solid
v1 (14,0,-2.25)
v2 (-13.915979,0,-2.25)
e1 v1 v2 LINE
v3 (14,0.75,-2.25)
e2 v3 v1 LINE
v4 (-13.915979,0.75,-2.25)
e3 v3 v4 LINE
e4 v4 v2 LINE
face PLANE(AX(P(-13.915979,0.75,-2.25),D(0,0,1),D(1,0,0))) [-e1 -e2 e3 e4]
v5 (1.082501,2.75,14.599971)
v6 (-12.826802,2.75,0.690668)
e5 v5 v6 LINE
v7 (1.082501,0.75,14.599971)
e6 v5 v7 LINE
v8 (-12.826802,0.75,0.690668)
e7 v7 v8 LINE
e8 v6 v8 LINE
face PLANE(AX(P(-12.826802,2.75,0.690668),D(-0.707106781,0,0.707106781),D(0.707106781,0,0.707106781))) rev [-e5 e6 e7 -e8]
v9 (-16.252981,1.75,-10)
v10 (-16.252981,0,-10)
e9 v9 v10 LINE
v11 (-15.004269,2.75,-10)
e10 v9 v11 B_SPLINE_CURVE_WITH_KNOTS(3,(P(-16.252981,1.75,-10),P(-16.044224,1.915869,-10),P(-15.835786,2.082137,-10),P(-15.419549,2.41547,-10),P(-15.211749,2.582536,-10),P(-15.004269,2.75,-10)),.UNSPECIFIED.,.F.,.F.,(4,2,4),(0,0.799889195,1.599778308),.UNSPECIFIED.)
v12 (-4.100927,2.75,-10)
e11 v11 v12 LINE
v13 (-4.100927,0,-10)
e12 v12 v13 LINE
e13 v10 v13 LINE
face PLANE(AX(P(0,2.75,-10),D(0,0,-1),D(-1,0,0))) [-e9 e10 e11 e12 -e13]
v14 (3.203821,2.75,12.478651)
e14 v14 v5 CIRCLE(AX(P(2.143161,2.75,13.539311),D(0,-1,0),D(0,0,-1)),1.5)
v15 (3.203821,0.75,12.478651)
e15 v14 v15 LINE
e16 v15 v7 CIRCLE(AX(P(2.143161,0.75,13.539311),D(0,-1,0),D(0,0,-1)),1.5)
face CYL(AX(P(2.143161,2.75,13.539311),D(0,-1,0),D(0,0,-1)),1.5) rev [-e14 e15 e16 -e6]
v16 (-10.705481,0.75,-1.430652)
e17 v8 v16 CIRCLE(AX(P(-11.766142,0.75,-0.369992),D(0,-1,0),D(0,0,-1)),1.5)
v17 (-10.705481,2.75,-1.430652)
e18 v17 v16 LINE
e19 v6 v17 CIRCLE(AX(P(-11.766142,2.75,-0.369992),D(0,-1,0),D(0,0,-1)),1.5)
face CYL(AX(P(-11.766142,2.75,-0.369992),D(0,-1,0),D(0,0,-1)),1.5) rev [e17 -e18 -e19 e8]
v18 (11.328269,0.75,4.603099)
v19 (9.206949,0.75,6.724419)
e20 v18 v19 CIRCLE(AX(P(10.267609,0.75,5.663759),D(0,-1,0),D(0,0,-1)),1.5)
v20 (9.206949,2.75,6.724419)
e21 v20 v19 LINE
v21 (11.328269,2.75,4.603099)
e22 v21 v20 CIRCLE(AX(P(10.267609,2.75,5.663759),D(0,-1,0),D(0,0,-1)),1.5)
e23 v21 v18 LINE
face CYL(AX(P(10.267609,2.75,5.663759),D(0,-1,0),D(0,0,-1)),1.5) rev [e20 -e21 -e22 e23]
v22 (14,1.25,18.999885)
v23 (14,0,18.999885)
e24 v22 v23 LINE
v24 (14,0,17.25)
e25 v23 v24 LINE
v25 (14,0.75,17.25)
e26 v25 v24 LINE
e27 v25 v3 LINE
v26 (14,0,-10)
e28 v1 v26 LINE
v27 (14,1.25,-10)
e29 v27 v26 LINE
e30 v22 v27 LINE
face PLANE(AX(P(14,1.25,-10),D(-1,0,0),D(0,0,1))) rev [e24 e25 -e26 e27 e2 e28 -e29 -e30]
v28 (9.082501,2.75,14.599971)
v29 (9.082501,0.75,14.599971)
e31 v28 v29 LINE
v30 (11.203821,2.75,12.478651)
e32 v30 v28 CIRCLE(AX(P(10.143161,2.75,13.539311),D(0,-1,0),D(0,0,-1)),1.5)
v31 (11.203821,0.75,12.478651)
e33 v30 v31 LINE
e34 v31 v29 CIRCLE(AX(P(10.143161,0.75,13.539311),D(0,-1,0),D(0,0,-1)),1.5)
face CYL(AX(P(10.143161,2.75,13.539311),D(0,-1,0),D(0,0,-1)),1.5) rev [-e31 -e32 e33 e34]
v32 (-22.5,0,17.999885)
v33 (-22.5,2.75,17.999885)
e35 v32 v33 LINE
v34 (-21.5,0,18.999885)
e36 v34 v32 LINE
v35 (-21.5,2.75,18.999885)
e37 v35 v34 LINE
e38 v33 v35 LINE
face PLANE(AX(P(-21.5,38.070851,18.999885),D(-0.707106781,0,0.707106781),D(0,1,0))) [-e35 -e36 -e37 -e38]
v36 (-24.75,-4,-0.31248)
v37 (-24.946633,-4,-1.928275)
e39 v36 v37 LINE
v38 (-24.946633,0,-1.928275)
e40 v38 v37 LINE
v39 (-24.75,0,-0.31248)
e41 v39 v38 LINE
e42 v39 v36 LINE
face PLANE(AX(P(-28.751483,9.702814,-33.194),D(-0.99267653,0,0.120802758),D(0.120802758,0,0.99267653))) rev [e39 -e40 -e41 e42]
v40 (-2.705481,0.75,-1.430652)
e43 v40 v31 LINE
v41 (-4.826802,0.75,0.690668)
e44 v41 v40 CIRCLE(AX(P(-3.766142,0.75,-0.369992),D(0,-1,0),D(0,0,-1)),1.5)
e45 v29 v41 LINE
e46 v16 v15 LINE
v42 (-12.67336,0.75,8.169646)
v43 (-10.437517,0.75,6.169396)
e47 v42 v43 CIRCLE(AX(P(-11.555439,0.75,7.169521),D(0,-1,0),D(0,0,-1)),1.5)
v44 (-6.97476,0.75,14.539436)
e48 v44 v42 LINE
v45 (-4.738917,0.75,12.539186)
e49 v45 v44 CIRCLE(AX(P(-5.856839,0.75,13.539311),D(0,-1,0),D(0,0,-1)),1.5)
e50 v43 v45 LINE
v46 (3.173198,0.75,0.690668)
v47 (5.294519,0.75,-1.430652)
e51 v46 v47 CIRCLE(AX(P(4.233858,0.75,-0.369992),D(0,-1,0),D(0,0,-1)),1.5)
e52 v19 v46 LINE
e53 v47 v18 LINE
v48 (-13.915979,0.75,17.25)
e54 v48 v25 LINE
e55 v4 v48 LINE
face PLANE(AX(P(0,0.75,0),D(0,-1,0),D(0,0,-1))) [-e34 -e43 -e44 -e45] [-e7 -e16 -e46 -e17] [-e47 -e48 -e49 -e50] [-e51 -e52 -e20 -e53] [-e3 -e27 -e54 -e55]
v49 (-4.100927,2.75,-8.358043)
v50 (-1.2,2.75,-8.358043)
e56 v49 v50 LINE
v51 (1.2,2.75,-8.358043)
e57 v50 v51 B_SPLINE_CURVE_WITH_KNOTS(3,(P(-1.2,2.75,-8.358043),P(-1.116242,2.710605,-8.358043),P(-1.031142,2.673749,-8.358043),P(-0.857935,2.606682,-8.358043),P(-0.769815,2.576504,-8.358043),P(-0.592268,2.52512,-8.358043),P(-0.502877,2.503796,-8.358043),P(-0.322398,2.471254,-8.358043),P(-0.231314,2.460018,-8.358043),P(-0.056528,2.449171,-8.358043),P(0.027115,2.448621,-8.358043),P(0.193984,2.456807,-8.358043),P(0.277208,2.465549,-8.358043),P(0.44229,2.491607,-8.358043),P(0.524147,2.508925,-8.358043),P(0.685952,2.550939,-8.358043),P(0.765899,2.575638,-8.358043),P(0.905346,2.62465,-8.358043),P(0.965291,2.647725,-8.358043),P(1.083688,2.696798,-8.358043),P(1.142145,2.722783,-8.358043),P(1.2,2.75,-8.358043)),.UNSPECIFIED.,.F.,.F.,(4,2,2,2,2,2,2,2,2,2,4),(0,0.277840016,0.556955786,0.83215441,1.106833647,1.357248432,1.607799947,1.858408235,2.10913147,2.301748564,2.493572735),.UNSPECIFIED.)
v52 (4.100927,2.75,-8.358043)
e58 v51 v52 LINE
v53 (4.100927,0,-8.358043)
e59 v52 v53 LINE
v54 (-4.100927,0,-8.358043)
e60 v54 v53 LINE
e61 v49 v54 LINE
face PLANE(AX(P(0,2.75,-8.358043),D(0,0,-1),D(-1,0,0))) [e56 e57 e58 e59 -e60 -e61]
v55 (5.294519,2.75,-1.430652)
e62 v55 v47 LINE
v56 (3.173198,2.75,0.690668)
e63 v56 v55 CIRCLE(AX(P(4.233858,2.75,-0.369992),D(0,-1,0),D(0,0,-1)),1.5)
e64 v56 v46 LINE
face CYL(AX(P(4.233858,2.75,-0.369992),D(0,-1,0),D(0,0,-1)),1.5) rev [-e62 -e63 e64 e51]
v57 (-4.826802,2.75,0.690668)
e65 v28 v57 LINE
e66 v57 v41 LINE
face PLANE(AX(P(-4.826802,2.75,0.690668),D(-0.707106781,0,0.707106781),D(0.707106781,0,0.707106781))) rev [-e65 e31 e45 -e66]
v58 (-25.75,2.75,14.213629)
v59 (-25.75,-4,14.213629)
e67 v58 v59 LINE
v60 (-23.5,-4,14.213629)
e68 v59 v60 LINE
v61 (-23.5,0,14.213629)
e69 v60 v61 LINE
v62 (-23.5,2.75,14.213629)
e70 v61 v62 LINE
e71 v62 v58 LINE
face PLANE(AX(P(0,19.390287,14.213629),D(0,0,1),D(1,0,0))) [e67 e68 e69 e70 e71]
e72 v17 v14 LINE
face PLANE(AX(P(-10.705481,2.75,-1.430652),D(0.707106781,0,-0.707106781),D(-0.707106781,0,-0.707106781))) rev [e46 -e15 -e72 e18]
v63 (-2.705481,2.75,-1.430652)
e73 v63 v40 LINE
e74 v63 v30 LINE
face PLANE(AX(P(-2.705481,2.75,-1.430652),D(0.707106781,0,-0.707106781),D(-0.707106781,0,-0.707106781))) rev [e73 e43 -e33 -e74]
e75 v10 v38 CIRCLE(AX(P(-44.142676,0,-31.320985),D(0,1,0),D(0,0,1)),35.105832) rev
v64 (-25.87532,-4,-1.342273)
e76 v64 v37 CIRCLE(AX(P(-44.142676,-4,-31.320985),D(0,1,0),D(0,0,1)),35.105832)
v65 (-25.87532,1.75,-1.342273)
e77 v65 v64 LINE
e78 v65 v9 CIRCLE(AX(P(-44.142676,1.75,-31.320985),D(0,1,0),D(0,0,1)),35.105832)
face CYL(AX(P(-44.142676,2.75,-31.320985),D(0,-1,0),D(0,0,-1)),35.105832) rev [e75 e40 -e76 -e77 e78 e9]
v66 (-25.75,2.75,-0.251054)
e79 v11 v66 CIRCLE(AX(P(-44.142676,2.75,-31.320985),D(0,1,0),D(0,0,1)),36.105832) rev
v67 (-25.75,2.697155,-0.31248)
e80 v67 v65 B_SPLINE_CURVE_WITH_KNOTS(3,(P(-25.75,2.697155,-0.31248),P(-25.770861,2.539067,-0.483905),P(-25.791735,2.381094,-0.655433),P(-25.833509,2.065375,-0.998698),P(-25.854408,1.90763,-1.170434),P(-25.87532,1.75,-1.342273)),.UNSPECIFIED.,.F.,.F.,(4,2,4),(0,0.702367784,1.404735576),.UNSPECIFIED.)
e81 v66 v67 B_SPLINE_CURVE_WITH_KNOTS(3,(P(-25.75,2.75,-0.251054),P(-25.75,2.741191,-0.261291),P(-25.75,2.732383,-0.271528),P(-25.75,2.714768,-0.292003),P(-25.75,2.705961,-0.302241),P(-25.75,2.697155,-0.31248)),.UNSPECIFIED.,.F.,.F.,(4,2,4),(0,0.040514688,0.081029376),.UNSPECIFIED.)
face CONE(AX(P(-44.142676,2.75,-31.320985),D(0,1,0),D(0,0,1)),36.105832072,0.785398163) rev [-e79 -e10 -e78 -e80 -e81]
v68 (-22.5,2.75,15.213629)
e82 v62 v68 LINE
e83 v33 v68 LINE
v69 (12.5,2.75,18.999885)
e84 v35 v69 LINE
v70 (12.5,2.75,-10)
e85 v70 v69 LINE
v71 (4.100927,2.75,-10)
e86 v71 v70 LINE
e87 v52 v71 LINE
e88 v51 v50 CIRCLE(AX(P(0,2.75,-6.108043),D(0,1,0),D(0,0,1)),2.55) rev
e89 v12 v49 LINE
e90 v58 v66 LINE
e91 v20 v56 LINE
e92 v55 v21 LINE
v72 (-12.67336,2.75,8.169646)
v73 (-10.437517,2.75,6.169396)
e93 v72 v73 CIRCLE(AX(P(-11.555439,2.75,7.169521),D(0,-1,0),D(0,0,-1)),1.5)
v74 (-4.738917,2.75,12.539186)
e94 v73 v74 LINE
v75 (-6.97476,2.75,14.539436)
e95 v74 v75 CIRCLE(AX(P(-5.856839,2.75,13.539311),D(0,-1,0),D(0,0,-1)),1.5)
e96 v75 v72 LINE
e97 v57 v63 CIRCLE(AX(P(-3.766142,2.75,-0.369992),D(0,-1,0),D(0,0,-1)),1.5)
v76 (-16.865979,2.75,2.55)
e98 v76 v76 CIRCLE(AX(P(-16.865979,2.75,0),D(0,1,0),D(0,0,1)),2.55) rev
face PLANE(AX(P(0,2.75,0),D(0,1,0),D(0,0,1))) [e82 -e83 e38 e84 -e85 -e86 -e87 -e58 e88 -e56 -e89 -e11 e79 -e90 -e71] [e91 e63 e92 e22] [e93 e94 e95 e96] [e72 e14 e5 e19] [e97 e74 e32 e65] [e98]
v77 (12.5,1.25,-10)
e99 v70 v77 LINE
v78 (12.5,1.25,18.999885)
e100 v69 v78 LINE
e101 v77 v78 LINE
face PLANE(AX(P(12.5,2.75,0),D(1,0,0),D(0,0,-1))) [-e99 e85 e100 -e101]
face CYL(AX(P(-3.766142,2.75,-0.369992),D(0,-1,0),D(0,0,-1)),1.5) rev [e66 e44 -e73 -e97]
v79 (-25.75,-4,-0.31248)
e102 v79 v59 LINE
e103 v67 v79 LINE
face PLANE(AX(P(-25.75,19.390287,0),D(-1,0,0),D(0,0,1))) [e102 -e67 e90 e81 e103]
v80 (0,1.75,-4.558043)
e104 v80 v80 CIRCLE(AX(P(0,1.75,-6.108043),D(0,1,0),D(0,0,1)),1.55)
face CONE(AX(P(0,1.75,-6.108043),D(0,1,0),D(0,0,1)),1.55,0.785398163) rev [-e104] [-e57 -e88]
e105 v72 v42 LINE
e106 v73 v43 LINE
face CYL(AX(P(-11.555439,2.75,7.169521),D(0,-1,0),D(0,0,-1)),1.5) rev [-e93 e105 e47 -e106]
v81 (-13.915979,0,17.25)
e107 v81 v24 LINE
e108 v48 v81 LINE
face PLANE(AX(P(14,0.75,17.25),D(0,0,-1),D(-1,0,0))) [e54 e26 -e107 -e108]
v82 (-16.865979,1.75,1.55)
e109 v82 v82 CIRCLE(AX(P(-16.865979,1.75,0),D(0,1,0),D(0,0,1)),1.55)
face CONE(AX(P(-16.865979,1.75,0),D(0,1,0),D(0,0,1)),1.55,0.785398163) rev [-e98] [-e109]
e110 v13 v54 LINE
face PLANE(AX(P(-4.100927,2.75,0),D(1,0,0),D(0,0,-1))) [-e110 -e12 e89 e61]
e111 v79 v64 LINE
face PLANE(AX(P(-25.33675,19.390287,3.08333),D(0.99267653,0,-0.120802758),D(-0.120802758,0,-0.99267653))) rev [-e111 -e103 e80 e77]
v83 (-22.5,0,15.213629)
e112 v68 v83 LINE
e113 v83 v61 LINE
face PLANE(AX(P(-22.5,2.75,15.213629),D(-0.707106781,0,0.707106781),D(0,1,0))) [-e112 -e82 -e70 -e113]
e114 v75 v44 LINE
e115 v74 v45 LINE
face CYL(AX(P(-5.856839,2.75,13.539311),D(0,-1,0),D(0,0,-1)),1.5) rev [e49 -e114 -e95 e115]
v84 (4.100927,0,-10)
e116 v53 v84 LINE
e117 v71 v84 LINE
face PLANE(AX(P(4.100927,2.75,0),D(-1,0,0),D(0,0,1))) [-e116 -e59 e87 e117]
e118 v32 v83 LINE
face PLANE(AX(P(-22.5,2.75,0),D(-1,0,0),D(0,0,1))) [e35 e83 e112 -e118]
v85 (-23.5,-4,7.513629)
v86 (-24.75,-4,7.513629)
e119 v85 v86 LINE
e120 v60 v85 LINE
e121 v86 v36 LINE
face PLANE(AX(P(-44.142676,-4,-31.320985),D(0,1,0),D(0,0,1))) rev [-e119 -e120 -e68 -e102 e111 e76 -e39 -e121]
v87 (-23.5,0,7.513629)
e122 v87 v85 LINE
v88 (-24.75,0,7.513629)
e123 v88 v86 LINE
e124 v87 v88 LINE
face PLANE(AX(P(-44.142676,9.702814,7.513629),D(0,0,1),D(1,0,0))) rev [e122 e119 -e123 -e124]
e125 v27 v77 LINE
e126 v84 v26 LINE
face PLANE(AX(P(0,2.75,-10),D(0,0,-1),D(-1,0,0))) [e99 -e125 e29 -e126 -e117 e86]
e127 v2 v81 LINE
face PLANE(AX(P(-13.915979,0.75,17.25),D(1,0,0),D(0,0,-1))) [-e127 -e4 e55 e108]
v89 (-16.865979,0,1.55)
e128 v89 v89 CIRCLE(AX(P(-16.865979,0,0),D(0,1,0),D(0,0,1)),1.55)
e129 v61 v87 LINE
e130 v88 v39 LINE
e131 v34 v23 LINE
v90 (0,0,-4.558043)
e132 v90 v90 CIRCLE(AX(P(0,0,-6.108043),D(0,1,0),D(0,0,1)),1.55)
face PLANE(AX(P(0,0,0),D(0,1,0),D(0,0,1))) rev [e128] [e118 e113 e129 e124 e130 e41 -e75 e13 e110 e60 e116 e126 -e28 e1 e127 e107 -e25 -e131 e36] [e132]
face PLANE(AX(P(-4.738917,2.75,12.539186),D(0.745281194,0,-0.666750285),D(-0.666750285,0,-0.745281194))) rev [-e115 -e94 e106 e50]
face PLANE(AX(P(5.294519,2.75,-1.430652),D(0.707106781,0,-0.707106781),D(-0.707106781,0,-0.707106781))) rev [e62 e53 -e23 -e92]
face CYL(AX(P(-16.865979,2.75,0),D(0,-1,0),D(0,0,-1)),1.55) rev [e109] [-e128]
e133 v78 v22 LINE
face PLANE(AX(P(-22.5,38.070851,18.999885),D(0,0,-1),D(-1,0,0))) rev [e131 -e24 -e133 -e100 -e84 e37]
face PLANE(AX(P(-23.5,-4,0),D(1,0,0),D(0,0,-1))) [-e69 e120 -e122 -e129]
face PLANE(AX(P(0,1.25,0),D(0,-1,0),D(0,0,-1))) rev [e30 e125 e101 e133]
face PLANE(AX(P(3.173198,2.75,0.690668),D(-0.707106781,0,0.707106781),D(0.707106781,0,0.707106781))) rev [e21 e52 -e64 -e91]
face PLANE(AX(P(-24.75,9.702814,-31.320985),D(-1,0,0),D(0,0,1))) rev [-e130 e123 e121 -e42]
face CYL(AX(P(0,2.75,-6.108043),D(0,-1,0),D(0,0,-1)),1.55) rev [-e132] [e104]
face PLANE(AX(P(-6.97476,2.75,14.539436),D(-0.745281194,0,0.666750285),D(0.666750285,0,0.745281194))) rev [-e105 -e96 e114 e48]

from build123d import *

# Parameters (mm, degrees)
SKETCH_221_R           = 1.55
EXTRUDE_926_DEPTH      = 2.75
SKETCH_1005_W          = 35.000000002
SKETCH_1005_H          = 4.75
EXTRUDE_1111_DEPTH     = 2.75
EXTRUDE_1_DEPTH        = 2.75
F_2_PCB_START          = -4
F_2_PCB_DEPTH          = 4
SKETCH_2154_W          = 1.5
SKETCH_2154_H          = 28.99988509
EXTRUDE_2226_DEPTH     = 1.25
SKETCH_2278_W          = 27.915979255
SKETCH_2278_H          = 19.5
PCB_DEPTH              = 0.75
CUT_EXTRUDE_2_DEPTH    = 33.451352798
CHAMFER_1_SIZE         = 1
CHAMFER_2_SIZE         = 1
CUT_EXTRUDE_3375_DEPTH = 4


with BuildPart() as part:
    # Sketch 221 → Extrude 926 (new body)
    with BuildSketch(Plane(origin=(0, 0, 0), x_dir=(1, 0, 0), z_dir=(0, 1, 0))):
        with BuildLine():
            ThreePointArc((-16.252981126, 10), (-20.15501929, 5.688743466), (-24.715186194, 2.08073674))
            Line((-24.715186194, 2.08073674), (-24.500000002, 0.312480077))
            Line((-24.500000002, 0.312480077), (-24.500000002, -7.263629174))
            Line((-24.500000002, -7.263629174), (-22.500000002, -7.263629174))
            Line((-22.500000002, -7.263629174), (-22.500000002, -14.24988509))
            Line((-22.500000002, -14.24988509), (12.5, -14.24988509))
            Line((12.5, -14.24988509), (12.5, 10))
            Line((12.5, 10), (4.100927374, 10))
            Line((4.100927374, 10), (4.100927374, 8.35804307))
            Line((4.100927374, 8.35804307), (-4.100927378, 8.35804307))
            Line((-4.100927378, 8.35804307), (-4.100927378, 10))
            Line((-4.100927378, 10), (-16.252981126, 10))
        make_face()
        with Locations(Location((-16.865979255, 0, 0), (0, 0, 270))):
            Circle(SKETCH_221_R, mode=Mode.SUBTRACT)
        with Locations(Location((-2e-09, 6.108043073, 0), (0, 0, 270))):
            Circle(SKETCH_221_R, mode=Mode.SUBTRACT)
    extrude(amount=EXTRUDE_926_DEPTH)

    # Sketch 1005 → Extrude 1111 (add)
    with BuildSketch(Plane(origin=(0, 0, 0), x_dir=(1, 0, 0), z_dir=(0, 1, 0))):
        with Locations((-5.000000001, -16.62488509)):
            Rectangle(SKETCH_1005_W, SKETCH_1005_H)
    extrude(amount=EXTRUDE_1111_DEPTH)

    # Sketch 1191 → 卡榫结构-1 (add)
    with BuildSketch(Plane(origin=(0, 0, 0), x_dir=(1, 0, 0), z_dir=(0, 1, 0))):
        with BuildLine():
            Line((-25.750000002, -14.213629174), (-22.500000002, -14.213629174))
            Line((-22.500000002, -14.213629174), (-22.500000002, -7.263629174))
            Line((-22.500000002, -7.263629174), (-24.500000002, -7.263629174))
            Line((-24.500000002, -7.263629174), (-24.500000002, 0.312480077))
            Line((-24.500000002, 0.312480077), (-24.715186194, 2.08073674))
            ThreePointArc((-24.715186194, 2.08073674), (-25.291636518, 1.705823535), (-25.875319612, 1.342273079))
            Line((-25.875319612, 1.342273079), (-25.750000002, 0.312480077))
            Line((-25.750000002, 0.312480077), (-25.750000002, -14.213629174))
        make_face()
    extrude(amount=EXTRUDE_1_DEPTH)

    # 草图5<4> → 卡榫结构-2-注意PCB凸出部分 (add)
    with BuildSketch(Plane(origin=(0, 0, 0), x_dir=(1, 0, 0), z_dir=(0, 1, 0)).offset(F_2_PCB_START)):
        with BuildLine():
            Line((-25.750000002, -14.213629174), (-23.500000002, -14.213629174))
            Line((-23.500000002, -14.213629174), (-23.500000002, -7.263629174))
            Line((-23.500000002, -7.263629174), (-24.500000002, -7.263629174))
            Line((-24.500000002, -7.263629174), (-24.500000002, 0.312480077))
            Line((-24.500000002, 0.312480077), (-24.715186194, 2.08073674))
            ThreePointArc((-24.715186194, 2.08073674), (-25.291636518, 1.705823535), (-25.875319612, 1.342273079))
            Line((-25.875319612, 1.342273079), (-25.750000002, 0.312480077))
            Line((-25.750000002, 0.312480077), (-25.750000002, -14.213629174))
        make_face()
    extrude(amount=F_2_PCB_DEPTH)

    # Sketch 2154 → Extrude 2226 (add)
    with BuildSketch(Plane(origin=(0, 0, 0), x_dir=(1, 0, 0), z_dir=(0, 1, 0))):
        with Locations((13.25, -4.499942545)):
            Rectangle(SKETCH_2154_W, SKETCH_2154_H)
    extrude(amount=EXTRUDE_2226_DEPTH)

    # Sketch 2278 → 稳压PCB器件高度补偿 (cut)
    with BuildSketch(Plane(origin=(0, 0, 0), x_dir=(1, 0, 0), z_dir=(0, 1, 0))):
        with Locations((0.042010372, -7.5)):
            Rectangle(SKETCH_2278_W, SKETCH_2278_H)
    extrude(amount=PCB_DEPTH, mode=Mode.SUBTRACT)

    # Sketch 2514 → 切除-拉伸2 (cut, through all)
    with BuildSketch(Plane.XZ.offset(-0.75)):
        with BuildLine():
            Line((3.173198201, 0.69066828), (9.20694903, 6.724419109))
            ThreePointArc((9.20694903, 6.724419109), (11.328269373, 6.724419109), (11.328269373, 4.603098766))
            Line((11.328269373, 4.603098766), (5.294518544, -1.430652063))
            ThreePointArc((5.294518544, -1.430652063), (3.173198201, -1.430652063), (3.173198201, 0.69066828))
        make_face()
        with BuildLine():
            Line((-4.826801799, 0.69066828), (9.08250112, 14.5999712))
            ThreePointArc((9.08250112, 14.5999712), (11.203821464, 14.5999712), (11.203821464, 12.478650856))
            Line((11.203821464, 12.478650856), (-2.705481456, -1.430652063))
            ThreePointArc((-2.705481456, -1.430652063), (-4.826801799, -1.430652063), (-4.826801799, 0.69066828))
        make_face()
        with BuildLine():
            Line((-12.826801799, 0.69066828), (1.08250112, 14.5999712))
            ThreePointArc((1.08250112, 14.5999712), (3.203821464, 14.5999712), (3.203821464, 12.478650856))
            Line((3.203821464, 12.478650856), (-10.705481456, -1.430652063))
            ThreePointArc((-10.705481456, -1.430652063), (-12.826801799, -1.430652063), (-12.826801799, 0.69066828))
        make_face()
        with BuildLine():
            Line((-4.738916917, 12.539185601), (-10.437516852, 6.169395501))
            ThreePointArc((-10.437516852, 6.169395501), (-12.555564069, 6.051599138), (-12.673360433, 8.169646355))
            Line((-12.673360433, 8.169646355), (-6.974760498, 14.539436455))
            ThreePointArc((-6.974760498, 14.539436455), (-4.856713281, 14.657232819), (-4.738916917, 12.539185601))
        make_face()
    extrude(amount=-CUT_EXTRUDE_2_DEPTH, mode=Mode.SUBTRACT)

    # 倒角1
    chamfer_1_edges = [part.edges().sort_by_distance(p)[0] for p in [
        (-20.661675073, 2.75, -5.223818951),
        (-22.500000002, 1.375, 18.99988509),
        (-22.500000002, 1.375, 14.213629174),
    ]]
    chamfer(chamfer_1_edges, length=CHAMFER_1_SIZE)

    # 倒角2
    # the kernel refuses this chamfer: 1 mm, written as the material it takes off along each edge
    with BuildSketch(Plane(origin=(-2e-09, 2.75, -6.108043073), x_dir=(0, 0, 1), z_dir=(-1, 0, 0))) as chamfer_2_piece_1:
        Polygon((1.55 + CHAMFER_2_SIZE, 0), (1.55, -CHAMFER_2_SIZE), (1.55, 0), align=None)
    revolve(axis=Axis((-2e-09, 2.75, -6.108043073), (0, 1, 0)), mode=Mode.SUBTRACT)
    with BuildSketch(Plane(origin=(-16.865979255, 2.75, 0), x_dir=(0, 0, 1), z_dir=(-1, 0, 0))) as chamfer_2_piece_2:
        Polygon((1.55 + CHAMFER_2_SIZE, 0), (1.55, -CHAMFER_2_SIZE), (1.55, 0), align=None)
    revolve(axis=Axis((-16.865979255, 2.75, 0), (0, 1, 0)), mode=Mode.SUBTRACT)

    # 草图1 → Cut-Extrude 3375 (cut)
    with BuildSketch(Plane.XZ.offset(4)):
        with BuildLine():
            Line((-24.715186194, -2.08073674), (-24.500000002, -0.312480077))
            Line((-24.500000002, -0.312480077), (-24.500000002, 7.263629174))
            Line((-24.500000002, 7.263629174), (-23.500000002, 7.263629174))
            Line((-23.500000002, 7.263629174), (-23.500000002, 7.513629174))
            Line((-23.500000002, 7.513629174), (-24.750000002, 7.513629174))
            Line((-24.750000002, 7.513629174), (-24.750000002, -0.312480077))
            Line((-24.750000002, -0.312480077), (-24.946632534, -1.928275128))
            ThreePointArc((-24.946632534, -1.928275128), (-24.830758909, -2.004277534), (-24.715186194, -2.08073674))
        make_face()
    extrude(amount=-CUT_EXTRUDE_3375_DEPTH, mode=Mode.SUBTRACT)


solid = part.part
